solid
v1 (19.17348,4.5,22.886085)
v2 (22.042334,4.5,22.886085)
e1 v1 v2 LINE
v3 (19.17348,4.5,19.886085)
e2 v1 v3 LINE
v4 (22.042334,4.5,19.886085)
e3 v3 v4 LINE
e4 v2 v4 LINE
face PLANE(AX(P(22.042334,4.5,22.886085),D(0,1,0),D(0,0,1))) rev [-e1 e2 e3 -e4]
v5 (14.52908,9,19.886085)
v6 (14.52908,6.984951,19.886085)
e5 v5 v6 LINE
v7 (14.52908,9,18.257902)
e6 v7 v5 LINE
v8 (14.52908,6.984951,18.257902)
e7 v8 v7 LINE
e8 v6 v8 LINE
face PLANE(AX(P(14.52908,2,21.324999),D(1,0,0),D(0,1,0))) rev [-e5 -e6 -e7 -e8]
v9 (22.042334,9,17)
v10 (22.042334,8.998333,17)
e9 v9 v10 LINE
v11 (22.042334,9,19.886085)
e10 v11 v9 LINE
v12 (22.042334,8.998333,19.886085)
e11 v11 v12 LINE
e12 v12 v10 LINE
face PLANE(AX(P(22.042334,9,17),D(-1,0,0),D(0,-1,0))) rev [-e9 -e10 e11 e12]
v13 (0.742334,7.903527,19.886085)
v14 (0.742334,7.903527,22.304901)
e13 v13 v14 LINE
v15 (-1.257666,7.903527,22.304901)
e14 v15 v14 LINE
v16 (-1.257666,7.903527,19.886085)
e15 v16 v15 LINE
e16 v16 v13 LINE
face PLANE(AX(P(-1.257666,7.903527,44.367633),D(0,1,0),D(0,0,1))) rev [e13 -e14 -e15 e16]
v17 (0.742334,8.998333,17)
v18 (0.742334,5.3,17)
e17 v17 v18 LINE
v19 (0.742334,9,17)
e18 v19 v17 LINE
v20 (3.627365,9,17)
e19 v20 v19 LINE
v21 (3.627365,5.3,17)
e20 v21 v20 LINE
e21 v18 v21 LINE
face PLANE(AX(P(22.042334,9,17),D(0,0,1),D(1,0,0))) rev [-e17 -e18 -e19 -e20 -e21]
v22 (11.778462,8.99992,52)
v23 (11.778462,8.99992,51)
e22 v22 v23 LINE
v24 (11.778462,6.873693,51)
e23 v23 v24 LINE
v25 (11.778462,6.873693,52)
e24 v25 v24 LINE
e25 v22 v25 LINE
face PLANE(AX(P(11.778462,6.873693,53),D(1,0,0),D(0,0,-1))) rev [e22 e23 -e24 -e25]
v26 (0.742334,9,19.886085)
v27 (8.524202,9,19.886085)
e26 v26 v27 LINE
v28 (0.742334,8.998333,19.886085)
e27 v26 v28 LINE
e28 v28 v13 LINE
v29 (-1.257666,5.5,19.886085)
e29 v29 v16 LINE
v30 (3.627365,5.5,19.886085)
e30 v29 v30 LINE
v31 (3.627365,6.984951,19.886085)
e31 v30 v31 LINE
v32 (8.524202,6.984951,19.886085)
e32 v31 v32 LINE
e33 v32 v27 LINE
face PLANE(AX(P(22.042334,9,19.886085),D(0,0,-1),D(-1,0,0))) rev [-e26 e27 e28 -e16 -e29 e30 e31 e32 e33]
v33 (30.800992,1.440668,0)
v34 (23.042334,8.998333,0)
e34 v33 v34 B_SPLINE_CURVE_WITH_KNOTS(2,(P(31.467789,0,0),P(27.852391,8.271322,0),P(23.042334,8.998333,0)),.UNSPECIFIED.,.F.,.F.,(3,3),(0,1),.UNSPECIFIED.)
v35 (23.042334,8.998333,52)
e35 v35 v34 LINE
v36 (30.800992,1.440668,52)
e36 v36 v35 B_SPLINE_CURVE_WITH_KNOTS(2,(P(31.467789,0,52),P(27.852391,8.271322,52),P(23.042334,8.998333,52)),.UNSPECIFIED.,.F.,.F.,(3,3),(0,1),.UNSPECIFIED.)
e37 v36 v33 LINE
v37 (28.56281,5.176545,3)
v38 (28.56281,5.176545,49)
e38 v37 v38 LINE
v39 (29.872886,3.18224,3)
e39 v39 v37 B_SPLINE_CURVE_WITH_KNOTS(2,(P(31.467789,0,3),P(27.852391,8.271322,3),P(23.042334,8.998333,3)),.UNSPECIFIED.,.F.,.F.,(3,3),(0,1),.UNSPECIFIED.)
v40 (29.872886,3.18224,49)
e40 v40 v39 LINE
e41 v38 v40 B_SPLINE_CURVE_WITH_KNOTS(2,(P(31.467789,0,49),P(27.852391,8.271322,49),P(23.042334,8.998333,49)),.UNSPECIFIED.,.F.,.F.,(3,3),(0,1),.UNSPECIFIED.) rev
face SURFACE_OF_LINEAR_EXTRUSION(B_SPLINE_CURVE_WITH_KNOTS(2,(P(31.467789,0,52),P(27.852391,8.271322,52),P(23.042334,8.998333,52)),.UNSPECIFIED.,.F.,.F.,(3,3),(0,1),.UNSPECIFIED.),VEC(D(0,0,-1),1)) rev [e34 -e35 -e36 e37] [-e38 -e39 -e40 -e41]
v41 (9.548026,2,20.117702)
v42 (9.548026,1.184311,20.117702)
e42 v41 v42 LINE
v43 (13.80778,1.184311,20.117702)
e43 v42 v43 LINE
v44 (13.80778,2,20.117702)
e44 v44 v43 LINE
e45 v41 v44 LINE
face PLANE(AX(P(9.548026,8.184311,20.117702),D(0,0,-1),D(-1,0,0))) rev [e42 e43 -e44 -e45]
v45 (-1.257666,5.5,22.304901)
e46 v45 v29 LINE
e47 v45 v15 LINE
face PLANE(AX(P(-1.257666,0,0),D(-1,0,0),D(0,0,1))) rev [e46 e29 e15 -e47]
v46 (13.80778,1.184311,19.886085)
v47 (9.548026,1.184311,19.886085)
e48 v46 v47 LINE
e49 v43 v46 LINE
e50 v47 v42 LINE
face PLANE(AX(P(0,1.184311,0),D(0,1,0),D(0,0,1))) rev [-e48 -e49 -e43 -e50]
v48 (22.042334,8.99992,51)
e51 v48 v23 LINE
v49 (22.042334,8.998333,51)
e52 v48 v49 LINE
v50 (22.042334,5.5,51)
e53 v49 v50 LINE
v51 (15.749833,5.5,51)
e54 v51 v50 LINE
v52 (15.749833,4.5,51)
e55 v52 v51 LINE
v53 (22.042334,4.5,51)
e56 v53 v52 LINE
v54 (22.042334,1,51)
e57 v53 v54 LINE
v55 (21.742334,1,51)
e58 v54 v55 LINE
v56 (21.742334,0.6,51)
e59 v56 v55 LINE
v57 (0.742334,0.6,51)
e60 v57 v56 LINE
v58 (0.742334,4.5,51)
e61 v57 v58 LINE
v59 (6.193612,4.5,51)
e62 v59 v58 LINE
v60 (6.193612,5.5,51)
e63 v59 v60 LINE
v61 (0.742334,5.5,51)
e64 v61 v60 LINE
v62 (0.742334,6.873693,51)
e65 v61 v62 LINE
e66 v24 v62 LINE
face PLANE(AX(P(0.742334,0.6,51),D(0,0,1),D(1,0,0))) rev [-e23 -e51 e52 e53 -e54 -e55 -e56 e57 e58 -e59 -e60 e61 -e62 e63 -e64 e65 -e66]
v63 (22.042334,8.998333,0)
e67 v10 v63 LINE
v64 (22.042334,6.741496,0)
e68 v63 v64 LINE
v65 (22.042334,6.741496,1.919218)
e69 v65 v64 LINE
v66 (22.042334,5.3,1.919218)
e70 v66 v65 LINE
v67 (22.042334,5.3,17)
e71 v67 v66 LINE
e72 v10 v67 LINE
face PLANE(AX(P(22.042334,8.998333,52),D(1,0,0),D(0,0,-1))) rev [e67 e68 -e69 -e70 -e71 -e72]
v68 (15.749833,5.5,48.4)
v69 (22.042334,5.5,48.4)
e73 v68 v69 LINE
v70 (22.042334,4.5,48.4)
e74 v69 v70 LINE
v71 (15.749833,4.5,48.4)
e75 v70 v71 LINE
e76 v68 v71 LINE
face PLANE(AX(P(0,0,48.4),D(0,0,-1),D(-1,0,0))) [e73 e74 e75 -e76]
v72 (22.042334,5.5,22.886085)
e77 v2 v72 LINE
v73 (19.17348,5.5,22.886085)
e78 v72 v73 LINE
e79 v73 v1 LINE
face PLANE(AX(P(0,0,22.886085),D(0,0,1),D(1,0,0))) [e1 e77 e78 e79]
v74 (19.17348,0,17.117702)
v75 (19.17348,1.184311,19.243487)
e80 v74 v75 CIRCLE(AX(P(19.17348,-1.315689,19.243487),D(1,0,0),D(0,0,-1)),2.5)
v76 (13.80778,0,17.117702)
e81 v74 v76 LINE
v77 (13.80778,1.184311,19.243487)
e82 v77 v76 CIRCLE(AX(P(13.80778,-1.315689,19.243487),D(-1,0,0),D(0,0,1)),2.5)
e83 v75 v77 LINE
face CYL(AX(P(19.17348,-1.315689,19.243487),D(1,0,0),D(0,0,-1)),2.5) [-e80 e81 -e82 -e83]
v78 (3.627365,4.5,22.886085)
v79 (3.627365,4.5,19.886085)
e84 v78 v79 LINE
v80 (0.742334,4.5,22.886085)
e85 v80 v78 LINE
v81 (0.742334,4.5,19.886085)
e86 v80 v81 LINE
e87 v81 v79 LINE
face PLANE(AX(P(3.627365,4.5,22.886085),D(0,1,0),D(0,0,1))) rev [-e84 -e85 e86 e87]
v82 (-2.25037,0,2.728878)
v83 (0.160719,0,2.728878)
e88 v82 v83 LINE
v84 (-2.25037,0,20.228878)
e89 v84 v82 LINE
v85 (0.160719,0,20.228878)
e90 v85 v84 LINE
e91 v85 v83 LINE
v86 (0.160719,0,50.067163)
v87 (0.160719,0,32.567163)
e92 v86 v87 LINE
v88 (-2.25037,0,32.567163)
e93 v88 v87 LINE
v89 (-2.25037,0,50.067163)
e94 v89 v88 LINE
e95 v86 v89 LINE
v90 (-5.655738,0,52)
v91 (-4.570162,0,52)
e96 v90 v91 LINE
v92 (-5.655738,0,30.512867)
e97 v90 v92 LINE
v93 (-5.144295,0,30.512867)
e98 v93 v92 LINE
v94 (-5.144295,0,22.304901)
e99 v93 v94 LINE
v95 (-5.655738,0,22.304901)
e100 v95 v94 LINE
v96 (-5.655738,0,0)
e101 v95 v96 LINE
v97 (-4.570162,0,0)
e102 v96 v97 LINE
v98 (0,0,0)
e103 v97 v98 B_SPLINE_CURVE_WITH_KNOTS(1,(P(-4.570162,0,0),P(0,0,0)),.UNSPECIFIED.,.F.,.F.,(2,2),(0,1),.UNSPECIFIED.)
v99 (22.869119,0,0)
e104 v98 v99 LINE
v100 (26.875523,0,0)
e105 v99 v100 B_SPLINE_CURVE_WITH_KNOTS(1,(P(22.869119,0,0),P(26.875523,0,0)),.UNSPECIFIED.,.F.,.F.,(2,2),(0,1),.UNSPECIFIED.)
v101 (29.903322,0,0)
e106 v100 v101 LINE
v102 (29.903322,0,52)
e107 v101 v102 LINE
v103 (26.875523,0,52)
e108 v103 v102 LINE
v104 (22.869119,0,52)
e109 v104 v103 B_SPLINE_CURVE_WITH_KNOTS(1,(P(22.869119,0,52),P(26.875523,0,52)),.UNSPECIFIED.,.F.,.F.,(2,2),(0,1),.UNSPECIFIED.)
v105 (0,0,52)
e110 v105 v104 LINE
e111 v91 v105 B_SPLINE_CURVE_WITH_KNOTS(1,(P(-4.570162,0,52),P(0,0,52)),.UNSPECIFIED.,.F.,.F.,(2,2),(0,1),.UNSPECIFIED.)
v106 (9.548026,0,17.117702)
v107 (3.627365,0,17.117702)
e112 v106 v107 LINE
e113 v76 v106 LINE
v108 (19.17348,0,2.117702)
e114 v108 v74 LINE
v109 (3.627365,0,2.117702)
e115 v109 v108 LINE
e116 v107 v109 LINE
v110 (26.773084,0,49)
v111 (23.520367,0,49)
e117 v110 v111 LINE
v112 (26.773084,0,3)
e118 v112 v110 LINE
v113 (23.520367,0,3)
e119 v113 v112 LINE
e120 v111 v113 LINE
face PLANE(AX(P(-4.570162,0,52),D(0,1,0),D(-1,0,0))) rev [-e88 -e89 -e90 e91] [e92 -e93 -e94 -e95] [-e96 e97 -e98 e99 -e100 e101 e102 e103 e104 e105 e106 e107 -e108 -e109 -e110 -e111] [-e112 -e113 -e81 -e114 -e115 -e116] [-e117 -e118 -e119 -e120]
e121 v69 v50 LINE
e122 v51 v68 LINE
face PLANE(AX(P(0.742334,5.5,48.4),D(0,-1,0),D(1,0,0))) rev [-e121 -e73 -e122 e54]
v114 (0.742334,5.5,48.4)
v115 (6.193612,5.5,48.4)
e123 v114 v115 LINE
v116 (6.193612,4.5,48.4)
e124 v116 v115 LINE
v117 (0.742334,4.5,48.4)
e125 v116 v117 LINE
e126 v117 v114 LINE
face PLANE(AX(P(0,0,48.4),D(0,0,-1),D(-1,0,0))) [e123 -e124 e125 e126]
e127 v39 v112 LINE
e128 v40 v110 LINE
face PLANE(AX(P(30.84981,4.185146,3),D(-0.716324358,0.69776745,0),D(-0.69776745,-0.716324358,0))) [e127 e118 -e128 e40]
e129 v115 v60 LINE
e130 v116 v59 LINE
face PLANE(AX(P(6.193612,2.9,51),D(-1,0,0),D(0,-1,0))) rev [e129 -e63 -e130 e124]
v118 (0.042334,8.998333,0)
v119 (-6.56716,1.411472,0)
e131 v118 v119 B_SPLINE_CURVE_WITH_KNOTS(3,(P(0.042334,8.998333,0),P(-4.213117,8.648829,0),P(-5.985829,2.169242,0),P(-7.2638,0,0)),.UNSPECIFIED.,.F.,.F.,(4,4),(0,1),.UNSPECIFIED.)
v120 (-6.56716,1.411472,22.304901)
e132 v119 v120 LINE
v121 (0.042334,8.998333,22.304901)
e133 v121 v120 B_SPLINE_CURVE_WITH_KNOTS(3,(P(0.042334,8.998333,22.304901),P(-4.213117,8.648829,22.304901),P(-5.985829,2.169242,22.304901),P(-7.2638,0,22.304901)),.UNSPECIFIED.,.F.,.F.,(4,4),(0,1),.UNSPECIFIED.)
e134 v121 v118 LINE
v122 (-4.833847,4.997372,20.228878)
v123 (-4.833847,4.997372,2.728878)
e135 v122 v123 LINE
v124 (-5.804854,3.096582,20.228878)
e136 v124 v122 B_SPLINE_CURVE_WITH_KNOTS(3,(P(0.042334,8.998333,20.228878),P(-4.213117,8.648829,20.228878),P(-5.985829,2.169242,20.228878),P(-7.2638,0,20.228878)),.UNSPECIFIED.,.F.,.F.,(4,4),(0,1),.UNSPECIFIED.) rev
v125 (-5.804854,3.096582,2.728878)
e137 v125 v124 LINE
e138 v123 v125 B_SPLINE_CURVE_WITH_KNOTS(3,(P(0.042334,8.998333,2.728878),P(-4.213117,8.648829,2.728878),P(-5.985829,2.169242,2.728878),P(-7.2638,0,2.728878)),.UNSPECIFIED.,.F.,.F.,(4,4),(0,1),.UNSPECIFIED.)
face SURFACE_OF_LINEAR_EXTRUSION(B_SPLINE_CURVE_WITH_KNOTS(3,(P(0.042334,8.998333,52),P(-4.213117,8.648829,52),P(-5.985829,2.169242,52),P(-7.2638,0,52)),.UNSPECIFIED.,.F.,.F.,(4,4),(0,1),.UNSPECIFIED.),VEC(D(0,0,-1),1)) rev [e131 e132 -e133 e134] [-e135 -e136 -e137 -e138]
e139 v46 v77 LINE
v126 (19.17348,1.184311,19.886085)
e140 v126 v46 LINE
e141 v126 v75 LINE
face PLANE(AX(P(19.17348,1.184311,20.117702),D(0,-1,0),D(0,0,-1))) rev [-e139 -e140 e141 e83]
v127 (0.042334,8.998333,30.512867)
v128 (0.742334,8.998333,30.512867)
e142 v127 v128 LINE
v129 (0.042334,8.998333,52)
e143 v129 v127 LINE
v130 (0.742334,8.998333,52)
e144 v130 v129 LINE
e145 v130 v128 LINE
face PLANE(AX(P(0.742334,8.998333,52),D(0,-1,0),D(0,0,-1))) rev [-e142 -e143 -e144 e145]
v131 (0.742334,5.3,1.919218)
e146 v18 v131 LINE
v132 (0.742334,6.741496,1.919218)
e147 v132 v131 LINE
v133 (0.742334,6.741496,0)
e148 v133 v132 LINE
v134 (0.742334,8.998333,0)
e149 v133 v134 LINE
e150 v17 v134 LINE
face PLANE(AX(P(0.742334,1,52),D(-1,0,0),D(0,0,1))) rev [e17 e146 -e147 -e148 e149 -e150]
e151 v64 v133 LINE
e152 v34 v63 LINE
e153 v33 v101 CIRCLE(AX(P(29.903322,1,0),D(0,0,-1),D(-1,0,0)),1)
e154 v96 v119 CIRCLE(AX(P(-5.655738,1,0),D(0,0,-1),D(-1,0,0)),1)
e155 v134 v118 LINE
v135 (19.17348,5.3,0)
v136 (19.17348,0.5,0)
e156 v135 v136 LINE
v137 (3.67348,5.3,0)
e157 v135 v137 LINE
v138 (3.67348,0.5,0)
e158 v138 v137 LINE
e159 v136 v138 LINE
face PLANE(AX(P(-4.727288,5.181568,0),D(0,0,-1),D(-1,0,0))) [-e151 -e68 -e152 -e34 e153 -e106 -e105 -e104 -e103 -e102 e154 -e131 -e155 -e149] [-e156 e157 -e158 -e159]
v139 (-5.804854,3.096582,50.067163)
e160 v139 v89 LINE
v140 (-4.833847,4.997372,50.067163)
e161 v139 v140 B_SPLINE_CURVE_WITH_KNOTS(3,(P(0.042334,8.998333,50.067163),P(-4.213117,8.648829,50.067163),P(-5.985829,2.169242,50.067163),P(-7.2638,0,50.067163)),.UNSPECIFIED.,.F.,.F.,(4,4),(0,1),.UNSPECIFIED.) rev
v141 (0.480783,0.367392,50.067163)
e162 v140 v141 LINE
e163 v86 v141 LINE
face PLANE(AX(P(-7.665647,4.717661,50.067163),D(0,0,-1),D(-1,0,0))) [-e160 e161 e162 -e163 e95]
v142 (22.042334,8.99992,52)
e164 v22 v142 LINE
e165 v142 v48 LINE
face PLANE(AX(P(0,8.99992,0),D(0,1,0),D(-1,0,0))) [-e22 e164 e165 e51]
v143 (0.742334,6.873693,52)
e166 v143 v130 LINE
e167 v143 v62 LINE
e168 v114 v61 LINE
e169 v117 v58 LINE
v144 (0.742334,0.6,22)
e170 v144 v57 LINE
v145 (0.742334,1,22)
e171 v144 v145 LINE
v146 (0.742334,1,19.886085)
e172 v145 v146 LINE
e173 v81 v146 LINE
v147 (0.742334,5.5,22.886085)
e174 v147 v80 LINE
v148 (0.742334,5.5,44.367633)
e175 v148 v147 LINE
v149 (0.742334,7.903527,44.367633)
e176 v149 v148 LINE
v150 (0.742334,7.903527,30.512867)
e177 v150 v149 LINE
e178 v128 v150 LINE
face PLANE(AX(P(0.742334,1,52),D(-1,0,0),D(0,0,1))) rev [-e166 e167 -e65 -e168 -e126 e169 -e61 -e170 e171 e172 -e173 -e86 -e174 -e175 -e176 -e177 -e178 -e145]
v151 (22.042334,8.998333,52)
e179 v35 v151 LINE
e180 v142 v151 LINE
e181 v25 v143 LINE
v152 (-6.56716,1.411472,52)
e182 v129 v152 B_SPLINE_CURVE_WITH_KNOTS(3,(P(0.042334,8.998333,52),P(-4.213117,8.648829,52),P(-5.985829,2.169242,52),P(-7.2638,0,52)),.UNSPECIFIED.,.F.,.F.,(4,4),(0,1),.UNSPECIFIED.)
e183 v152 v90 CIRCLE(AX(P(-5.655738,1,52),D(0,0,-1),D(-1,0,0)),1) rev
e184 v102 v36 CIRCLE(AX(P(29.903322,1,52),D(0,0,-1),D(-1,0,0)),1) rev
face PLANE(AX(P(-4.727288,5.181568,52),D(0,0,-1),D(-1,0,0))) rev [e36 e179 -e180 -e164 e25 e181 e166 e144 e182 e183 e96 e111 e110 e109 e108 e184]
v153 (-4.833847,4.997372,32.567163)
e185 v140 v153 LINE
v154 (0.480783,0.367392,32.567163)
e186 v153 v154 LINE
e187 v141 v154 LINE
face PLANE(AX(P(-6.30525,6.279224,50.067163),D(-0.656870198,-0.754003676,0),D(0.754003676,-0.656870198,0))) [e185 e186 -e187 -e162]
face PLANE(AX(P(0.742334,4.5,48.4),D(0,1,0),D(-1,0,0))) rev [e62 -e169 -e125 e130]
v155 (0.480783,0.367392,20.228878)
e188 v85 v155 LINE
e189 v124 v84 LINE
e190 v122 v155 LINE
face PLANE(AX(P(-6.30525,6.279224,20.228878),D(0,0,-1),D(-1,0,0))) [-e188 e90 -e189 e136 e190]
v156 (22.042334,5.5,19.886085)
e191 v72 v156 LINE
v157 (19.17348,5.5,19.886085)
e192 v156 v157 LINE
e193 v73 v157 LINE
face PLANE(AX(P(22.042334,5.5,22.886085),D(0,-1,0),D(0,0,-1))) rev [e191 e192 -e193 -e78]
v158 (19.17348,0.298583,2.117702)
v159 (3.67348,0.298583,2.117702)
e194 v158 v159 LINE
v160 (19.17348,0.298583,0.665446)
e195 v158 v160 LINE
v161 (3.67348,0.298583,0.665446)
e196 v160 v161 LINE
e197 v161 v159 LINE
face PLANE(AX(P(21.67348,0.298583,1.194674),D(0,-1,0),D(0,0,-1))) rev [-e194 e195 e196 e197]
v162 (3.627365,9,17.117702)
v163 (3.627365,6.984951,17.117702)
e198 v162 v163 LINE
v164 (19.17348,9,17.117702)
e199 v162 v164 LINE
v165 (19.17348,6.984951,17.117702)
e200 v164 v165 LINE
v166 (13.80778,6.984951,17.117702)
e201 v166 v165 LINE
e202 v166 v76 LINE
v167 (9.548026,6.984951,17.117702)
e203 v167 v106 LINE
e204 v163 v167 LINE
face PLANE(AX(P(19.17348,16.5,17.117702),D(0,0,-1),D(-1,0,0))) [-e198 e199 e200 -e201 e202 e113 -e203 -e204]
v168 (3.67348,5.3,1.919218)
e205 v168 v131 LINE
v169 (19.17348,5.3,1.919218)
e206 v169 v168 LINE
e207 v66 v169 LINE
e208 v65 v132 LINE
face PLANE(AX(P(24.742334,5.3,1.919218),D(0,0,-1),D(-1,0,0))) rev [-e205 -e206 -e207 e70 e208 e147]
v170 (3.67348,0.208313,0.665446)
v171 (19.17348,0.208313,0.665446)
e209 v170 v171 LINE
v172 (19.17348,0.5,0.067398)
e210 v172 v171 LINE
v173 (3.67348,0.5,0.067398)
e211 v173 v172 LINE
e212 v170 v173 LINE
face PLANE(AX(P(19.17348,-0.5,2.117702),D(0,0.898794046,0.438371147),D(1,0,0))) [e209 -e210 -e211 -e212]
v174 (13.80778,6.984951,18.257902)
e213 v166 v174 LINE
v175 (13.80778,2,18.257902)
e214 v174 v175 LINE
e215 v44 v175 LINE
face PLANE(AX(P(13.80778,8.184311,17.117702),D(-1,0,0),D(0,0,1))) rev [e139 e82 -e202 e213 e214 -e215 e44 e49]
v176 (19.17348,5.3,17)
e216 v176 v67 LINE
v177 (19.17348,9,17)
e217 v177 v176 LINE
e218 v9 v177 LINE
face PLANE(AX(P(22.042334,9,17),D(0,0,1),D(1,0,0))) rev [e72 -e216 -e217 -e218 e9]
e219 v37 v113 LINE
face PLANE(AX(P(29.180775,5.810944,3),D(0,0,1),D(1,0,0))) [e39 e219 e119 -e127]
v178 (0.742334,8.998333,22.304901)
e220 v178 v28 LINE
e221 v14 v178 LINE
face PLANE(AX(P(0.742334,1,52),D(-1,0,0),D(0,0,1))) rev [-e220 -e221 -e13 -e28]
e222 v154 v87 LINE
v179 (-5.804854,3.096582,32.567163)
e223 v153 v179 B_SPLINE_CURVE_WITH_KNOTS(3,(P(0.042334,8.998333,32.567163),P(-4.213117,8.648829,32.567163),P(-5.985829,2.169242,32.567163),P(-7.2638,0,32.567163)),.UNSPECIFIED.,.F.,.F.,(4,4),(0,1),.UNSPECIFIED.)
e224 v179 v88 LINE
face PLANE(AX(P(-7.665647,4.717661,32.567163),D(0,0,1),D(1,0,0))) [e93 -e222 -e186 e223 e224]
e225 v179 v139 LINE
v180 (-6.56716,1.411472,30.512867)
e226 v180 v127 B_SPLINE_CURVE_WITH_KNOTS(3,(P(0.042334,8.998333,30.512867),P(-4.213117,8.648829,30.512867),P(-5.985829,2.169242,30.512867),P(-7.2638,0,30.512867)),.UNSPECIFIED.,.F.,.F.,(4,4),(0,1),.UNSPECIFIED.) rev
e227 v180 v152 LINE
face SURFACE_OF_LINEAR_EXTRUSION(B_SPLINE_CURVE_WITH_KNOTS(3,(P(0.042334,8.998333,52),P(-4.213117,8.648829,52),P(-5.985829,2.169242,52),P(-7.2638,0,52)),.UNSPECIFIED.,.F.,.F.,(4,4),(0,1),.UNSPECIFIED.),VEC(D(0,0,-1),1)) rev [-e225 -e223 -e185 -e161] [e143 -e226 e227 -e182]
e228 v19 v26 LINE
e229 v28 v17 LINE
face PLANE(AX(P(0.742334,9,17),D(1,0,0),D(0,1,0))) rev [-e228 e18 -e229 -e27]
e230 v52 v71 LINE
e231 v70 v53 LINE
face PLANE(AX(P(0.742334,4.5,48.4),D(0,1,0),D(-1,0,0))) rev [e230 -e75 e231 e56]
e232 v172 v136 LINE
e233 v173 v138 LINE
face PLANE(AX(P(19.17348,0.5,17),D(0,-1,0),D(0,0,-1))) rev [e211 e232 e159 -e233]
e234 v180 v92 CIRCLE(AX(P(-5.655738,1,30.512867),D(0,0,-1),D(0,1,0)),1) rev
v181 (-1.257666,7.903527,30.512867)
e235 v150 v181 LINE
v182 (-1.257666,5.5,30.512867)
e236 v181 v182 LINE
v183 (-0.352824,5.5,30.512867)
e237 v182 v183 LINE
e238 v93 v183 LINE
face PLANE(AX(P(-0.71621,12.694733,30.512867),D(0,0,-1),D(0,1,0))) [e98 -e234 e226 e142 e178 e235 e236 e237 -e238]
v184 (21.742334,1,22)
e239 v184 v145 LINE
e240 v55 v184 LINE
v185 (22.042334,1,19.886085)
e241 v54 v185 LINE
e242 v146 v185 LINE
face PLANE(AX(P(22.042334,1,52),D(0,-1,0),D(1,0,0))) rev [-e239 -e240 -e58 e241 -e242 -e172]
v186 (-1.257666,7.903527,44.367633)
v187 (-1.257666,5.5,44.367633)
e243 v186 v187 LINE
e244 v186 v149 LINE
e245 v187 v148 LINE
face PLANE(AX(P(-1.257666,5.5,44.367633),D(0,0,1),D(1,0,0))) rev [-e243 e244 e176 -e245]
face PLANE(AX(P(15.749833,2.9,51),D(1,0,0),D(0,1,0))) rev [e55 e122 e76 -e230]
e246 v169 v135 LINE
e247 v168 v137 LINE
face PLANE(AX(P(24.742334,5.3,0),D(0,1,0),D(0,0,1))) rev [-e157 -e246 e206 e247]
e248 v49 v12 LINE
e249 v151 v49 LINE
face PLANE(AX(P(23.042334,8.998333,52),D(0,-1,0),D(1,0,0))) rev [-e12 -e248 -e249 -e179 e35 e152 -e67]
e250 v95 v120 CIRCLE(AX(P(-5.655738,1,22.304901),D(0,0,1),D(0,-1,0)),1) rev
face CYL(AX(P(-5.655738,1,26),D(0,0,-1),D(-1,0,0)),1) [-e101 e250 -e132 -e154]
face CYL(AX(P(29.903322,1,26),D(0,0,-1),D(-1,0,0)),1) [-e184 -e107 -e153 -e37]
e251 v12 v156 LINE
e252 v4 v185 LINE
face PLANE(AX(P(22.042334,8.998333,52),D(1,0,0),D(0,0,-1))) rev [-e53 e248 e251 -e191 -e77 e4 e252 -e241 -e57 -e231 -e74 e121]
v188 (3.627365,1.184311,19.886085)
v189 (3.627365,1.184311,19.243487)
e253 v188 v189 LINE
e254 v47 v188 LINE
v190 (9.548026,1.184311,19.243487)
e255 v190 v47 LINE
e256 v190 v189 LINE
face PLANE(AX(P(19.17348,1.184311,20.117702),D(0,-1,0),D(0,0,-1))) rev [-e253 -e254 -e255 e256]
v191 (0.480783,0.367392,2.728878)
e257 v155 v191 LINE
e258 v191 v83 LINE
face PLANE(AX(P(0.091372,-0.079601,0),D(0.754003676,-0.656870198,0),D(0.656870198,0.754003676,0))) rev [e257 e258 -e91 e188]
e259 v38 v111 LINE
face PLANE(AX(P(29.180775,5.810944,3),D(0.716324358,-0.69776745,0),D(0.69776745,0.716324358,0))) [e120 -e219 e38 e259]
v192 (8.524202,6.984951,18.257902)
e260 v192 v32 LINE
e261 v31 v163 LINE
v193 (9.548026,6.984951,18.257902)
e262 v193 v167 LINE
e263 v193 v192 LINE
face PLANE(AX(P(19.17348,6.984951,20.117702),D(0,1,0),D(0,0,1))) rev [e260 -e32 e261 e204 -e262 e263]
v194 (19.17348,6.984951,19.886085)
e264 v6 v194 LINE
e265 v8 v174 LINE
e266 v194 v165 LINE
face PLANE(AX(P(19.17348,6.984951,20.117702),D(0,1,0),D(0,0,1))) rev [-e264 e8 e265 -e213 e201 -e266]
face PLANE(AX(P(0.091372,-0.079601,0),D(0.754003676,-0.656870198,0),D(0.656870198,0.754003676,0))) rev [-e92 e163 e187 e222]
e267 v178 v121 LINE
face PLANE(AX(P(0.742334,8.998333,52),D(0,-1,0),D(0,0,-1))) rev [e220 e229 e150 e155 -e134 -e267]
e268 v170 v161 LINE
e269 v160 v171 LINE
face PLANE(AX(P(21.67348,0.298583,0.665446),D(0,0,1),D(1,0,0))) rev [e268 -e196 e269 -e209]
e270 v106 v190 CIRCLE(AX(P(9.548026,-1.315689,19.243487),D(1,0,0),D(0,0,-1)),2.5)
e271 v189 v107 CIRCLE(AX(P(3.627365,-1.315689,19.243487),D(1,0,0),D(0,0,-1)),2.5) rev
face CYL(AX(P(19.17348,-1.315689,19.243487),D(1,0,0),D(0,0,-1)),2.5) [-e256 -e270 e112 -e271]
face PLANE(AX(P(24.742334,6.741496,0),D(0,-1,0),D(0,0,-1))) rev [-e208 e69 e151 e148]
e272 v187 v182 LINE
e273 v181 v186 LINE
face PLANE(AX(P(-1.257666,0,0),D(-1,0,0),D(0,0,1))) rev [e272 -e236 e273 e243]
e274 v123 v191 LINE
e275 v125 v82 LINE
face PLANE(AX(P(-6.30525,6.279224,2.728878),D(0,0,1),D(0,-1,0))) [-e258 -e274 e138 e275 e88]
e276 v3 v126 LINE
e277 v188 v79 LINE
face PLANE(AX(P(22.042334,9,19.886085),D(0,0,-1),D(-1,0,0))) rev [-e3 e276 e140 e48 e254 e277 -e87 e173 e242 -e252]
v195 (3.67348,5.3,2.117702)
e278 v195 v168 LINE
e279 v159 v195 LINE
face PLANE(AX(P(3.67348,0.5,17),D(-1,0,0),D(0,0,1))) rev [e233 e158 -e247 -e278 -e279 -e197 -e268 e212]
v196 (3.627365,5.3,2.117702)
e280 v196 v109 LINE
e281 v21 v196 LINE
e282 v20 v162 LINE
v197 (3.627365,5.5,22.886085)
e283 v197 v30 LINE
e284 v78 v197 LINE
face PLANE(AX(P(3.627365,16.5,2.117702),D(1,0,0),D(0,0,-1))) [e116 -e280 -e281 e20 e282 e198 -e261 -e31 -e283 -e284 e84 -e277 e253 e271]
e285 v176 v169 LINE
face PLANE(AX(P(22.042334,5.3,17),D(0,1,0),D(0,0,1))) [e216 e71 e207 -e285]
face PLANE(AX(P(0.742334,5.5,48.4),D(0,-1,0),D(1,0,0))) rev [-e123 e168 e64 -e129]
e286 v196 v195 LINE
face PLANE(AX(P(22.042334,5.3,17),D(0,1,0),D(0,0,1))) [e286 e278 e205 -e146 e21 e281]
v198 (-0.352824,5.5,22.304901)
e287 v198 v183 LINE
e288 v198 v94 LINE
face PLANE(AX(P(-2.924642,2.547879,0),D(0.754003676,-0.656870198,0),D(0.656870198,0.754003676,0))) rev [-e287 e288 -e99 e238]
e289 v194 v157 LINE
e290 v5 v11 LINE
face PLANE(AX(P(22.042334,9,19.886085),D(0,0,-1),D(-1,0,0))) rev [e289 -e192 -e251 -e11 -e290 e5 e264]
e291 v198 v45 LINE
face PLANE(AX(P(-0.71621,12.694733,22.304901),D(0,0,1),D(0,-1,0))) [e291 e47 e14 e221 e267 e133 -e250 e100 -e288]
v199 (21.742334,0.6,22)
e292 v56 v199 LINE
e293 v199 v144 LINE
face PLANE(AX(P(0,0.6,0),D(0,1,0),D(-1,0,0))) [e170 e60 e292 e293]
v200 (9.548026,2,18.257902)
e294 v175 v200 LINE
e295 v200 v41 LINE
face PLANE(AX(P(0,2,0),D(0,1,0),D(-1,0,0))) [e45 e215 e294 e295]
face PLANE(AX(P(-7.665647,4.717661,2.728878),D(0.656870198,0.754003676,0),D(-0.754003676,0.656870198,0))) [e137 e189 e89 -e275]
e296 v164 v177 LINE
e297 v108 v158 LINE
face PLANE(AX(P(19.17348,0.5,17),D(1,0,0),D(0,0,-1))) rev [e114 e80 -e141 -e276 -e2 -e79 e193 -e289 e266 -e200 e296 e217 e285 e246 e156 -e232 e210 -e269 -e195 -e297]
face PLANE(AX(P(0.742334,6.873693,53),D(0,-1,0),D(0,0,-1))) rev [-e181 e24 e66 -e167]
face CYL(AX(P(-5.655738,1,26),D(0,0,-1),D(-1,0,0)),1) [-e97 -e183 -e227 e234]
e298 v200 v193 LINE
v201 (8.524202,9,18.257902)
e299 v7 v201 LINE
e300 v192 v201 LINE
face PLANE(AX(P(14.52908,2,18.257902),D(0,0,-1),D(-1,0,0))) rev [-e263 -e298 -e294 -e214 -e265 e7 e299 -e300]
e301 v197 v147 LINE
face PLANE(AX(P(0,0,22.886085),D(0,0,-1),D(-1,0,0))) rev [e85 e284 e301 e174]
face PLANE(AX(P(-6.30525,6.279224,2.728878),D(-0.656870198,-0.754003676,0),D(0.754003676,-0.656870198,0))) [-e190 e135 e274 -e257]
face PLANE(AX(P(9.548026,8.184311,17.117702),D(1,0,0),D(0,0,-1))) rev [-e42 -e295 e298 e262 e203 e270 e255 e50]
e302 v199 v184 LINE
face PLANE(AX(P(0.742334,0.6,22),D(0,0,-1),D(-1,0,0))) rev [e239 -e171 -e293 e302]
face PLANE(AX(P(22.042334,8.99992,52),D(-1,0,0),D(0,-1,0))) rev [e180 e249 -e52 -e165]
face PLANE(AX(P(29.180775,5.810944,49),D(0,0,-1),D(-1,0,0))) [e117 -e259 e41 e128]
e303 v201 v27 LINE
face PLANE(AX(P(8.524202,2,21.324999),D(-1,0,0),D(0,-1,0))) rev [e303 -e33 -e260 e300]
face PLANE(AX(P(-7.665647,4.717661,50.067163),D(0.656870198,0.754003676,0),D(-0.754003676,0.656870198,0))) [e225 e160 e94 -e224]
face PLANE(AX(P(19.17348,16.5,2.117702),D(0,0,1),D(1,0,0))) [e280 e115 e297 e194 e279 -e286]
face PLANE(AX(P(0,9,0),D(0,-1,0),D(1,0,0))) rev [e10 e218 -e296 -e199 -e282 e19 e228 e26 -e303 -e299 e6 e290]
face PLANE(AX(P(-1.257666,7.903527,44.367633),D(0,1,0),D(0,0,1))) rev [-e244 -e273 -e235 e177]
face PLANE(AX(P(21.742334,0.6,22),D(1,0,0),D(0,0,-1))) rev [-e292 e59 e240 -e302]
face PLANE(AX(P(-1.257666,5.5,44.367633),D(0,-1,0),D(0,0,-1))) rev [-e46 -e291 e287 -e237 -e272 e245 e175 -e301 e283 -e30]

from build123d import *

# Parameters (mm, degrees)
BOSS_EXTRUDE2_DEPTH      = 52
FILLET2_R                = 1
CUT_EXTRUDE2_DEPTH       = 3
CUT_EXTRUDE2_DEPTH_BACK  = 6
SKETCH10_W               = 2.071027546
SKETCH10_H               = 17.5
SKETCH12_W               = 21
SKETCH12_H               = 29
BATTERY_DEPTH            = 0.4
SKETCH14_W               = 21.3
SKETCH14_H               = 1
BOSS_EXTRUDE4_DEPTH      = 7.999920354
FILLET5_R                = 1
SKETCH19_W               = 21.3
SKETCH19_H               = 1
BOSS_EXTRUDE5_DEPTH      = 2.6
SKETCH20_W               = 9.556221564
SKETCH20_H               = 2.6
CUT_EXTRUDE9_DEPTH       = 2.6
SKETCH21_W               = 21.3
SKETCH21_H               = 2.886084762
BOSS_EXTRUDE6_DEPTH      = 8
SKETCH23_W               = 24.481547991
SKETCH23_H               = 2.403526745
CUT_EXTRUDE10_DEPTH      = 2
SKETCH26_W               = 11.036128308
SKETCH26_H               = 2.126226966
CUT_EXTRUDE11_DEPTH      = 2
CUT_EXTRUDE12_DEPTH      = 2
CUT_EXTRUDE12_DEPTH_BACK = 11
SKETCH27_W               = 46
SKETCH27_H               = 2.33
CUT_EXTRUDE15_DEPTH      = 3
CUT_EXTRUDE15_DEPTH_BACK = 2
SKETCH30_W               = 16.027497941
SKETCH30_H               = 8.207966742
SKETCH32_W               = 21.3
SKETCH32_H               = 4.3
BOSS_EXTRUDE7_DEPTH      = 17
SKETCH33_W               = 15.5
SKETCH33_H               = 4.8
CUT_EXTRUDE16_DEPTH      = 17
CUT_EXTRUDE17_DEPTH      = 16
CUT_EXTRUDE17_DEPTH_BACK = 16
SKETCH34_W               = 15.546115034
SKETCH34_H               = 15
CHAMFER1_SIZE            = 2.050303842
CHAMFER1_SIZE_2          = 1
SKETCH36_W               = 1.919218309
SKETCH36_H               = 1.441495618
BOSS_EXTRUDE8_DEPTH      = 24
SKETCH37_W               = 15.546115034
SKETCH37_H               = 5.800639797
CUT_EXTRUDE18_DEPTH      = 3
SKETCH38_W               = 4.259754253
SKETCH38_H               = 3
BOSS_EXTRUDE9_DEPTH      = 7
FILLET6_R                = 2.5
BOSS_EXTRUDE10_DEPTH     = 18
SKETCH41_W               = 2.868853839
SKETCH41_H               = 1
SKETCH41_W_2             = 2.885031127
BOSS_EXTRUDE11_DEPTH     = 3
SKETCH42_W               = 6.004877842
SKETCH42_H               = 3.067097043
CUT_EXTRUDE19_DEPTH      = 7


with BuildPart() as part:
    # Sketch1 → Boss-Extrude2 (new body)
    with BuildSketch(Plane.XY):
        with BuildLine():
            Line((-4.570161627, 0), (-7.263800128, 0))
            add(Edge.make_bspline(
                [(0.042333709, 8.998333002), (-4.213116867, 8.648828695), (-5.985828681, 2.169241543), (-7.263800128, 0)],
                knots=[0, 0, 0, 0, 1, 1, 1, 1], degree=3))
            Line((0.042333709, 8.998333002), (0.742333709, 8.998333002))
            Line((0.742333709, 8.998333002), (0.742333709, 1))
            Line((0.742333709, 1), (22.042333709, 1))
            Line((22.042333709, 1), (22.042333709, 8.998333002))
            Line((22.042333709, 8.998333002), (23.042333709, 8.998333002))
            add(Edge.make_bspline(
                [(23.042333709, 8.998333002), (27.852391375, 8.27132168), (31.467788923, 0)],
                knots=[0, 0, 0, 1, 1, 1], degree=2))
            Line((31.467788923, 0), (26.875523276, 0))
            Line((26.875523276, 0), (22.86911945, 0))
            Line((22.86911945, 0), (0, 0))
            Line((0, 0), (-4.570161627, 0))
        make_face()
    extrude(amount=BOSS_EXTRUDE2_DEPTH)

    # Fillet2
    fillet2_edges = [part.edges().sort_by_distance(p)[0] for p in [
        (-7.263800128, 0, 26),
    ]]
    fillet(fillet2_edges, radius=FILLET2_R)

    # Sketch10 → Cut-Extrude2 (cut, two sides: drawn at the far end of the back side and taken through both)
    with BuildSketch(Plane(origin=(-4.432649633, 3.861619691, 0), x_dir=(0.6568701979277837, 0.7540036757697632, 0), z_dir=(-0.7540036757697632, 0.6568701979277837, 0)).offset(-CUT_EXTRUDE2_DEPTH_BACK)):
        with Locations((-0.442686988, -41.317163409)):
            Rectangle(SKETCH10_W, SKETCH10_H)
        with Locations((-0.442686988, -11.478878468)):
            Rectangle(SKETCH10_W, SKETCH10_H)
    extrude(amount=CUT_EXTRUDE2_DEPTH + CUT_EXTRUDE2_DEPTH_BACK, mode=Mode.SUBTRACT)

    # Sketch12 → Battery (cut)
    with BuildSketch(Plane(origin=(0, 1, 0), x_dir=(1, 0, 0), z_dir=(0, 1, 0))):
        with Locations((11.242333709, -36.5)):
            Rectangle(SKETCH12_W, SKETCH12_H)
    extrude(amount=-BATTERY_DEPTH, mode=Mode.SUBTRACT)

    # Sketch14 → Boss-Extrude4 (add)
    with BuildSketch(Plane(origin=(0, 1, 0), x_dir=(1, 0, 0), z_dir=(0, 1, 0))):
        with Locations((11.392333709, -51.5)):
            Rectangle(SKETCH14_W, SKETCH14_H)
    extrude(amount=BOSS_EXTRUDE4_DEPTH)

    # Fillet5
    fillet5_edges = [part.edges().sort_by_distance(p)[0] for p in [
        (31.467788923, 0, 26),
    ]]
    fillet(fillet5_edges, radius=FILLET5_R)

    # Sketch19 → Boss-Extrude5 (add)
    with BuildSketch(Plane(origin=(0, 0, 51), x_dir=(-1, 0, 0), z_dir=(0, 0, -1))):
        with Locations((-11.392333709, 5)):
            Rectangle(SKETCH19_W, SKETCH19_H)
    extrude(amount=BOSS_EXTRUDE5_DEPTH)

    # Sketch20 → Cut-Extrude9 (cut)
    with BuildSketch(Plane(origin=(0, 5.5, 0), x_dir=(1, 0, 0), z_dir=(0, 1, 0))):
        with Locations((10.971722634, -49.7)):
            Rectangle(SKETCH20_W, SKETCH20_H)
    extrude(amount=-CUT_EXTRUDE9_DEPTH, mode=Mode.SUBTRACT)

    # Sketch21 → Boss-Extrude6 (add)
    with BuildSketch(Plane(origin=(0, 1, 0), x_dir=(1, 0, 0), z_dir=(0, 1, 0))):
        with Locations((11.392333709, -18.443042381)):
            Rectangle(SKETCH21_W, SKETCH21_H)
    extrude(amount=BOSS_EXTRUDE6_DEPTH)

    # Sketch23 → Cut-Extrude10 (cut)
    with BuildSketch(Plane(origin=(0.742333709, 0, 0), x_dir=(0, 0, -1), z_dir=(1, 0, 0))):
        with Locations((-32.126858758, 6.701763373)):
            Rectangle(SKETCH23_W, SKETCH23_H)
    extrude(amount=-CUT_EXTRUDE10_DEPTH, mode=Mode.SUBTRACT)

    # Sketch26 → Cut-Extrude11 (cut)
    with BuildSketch(Plane(origin=(0, 0, 51), x_dir=(-1, 0, 0), z_dir=(0, 0, -1))):
        with Locations((-6.260397863, 7.936806871)):
            Rectangle(SKETCH26_W, SKETCH26_H)
    extrude(amount=-CUT_EXTRUDE11_DEPTH, mode=Mode.SUBTRACT)

    # Sketch27 → Cut-Extrude12 (cut, two sides: drawn at the far end of the back side and taken through both)
    with BuildSketch(Plane(origin=(15.71645511, 16.134429341, 0), x_dir=(0, 0, -1), z_dir=(0.6977674498915984, 0.7163243580053493, 0)).offset(-CUT_EXTRUDE12_DEPTH_BACK)):
        with Locations((-26, -18.013212029)):
            Rectangle(SKETCH27_W, SKETCH27_H)
    extrude(amount=CUT_EXTRUDE12_DEPTH + CUT_EXTRUDE12_DEPTH_BACK, mode=Mode.SUBTRACT)

    # Sketch30 → Cut-Extrude15 (cut, two sides: drawn at the far end of the back side and taken through both)
    with BuildSketch(Plane(origin=(-4.432649633, 3.861619691, 0), x_dir=(0.6568701979277837, 0.7540036757697632, 0), z_dir=(-0.7540036757697632, 0.6568701979277837, 0)).offset(-CUT_EXTRUDE15_DEPTH_BACK)):
        with Locations((1.087669114, -26.408883952)):
            Rectangle(SKETCH30_W, SKETCH30_H)
    extrude(amount=CUT_EXTRUDE15_DEPTH + CUT_EXTRUDE15_DEPTH_BACK, mode=Mode.SUBTRACT)

    # Sketch32 → Boss-Extrude7 (add)
    with BuildSketch(Plane(origin=(0, 0, 0), x_dir=(-1, 0, 0), z_dir=(0, 0, -1))):
        with Locations((-11.392333709, 3.15)):
            Rectangle(SKETCH32_W, SKETCH32_H)
    extrude(amount=-BOSS_EXTRUDE7_DEPTH)

    # Sketch33 → Cut-Extrude16 (cut)
    with BuildSketch(Plane(origin=(0, 0, 0), x_dir=(-1, 0, 0), z_dir=(0, 0, -1))):
        with Locations((-11.42347987, 2.9)):
            Rectangle(SKETCH33_W, SKETCH33_H)
    extrude(amount=-CUT_EXTRUDE16_DEPTH, mode=Mode.SUBTRACT)

    # Sketch34 → Cut-Extrude17 (cut, two sides: drawn at the far end of the back side and taken through both)
    with BuildSketch(Plane(origin=(0, 0.5, 0), x_dir=(1, 0, 0), z_dir=(0, 1, 0)).offset(-CUT_EXTRUDE17_DEPTH_BACK)):
        with Locations((11.400422353, -9.617701537)):
            Rectangle(SKETCH34_W, SKETCH34_H)
    extrude(amount=CUT_EXTRUDE17_DEPTH + CUT_EXTRUDE17_DEPTH_BACK, mode=Mode.SUBTRACT)

    # Chamfer1
    # the kernel refuses this chamfer: 2.050303842, 1 mm, written as the material it takes off along each edge
    with BuildSketch(Plane(origin=(19.17347987, 0.5, 2.117701537), x_dir=(0, 0.016923890849829, -0.9998567807033681), z_dir=(-1, 0, 0))) as chamfer1_piece_1:
        Polygon((CHAMFER1_SIZE * 0.999856780498, CHAMFER1_SIZE * 0.0169238908464), (-CHAMFER1_SIZE_2 * 0.0169238908498, CHAMFER1_SIZE_2 * 0.999856780703), (0, 0), align=None)
    extrude(amount=15.5, mode=Mode.SUBTRACT)

    # Sketch36 → Boss-Extrude8 (add)
    with BuildSketch(Plane(origin=(0.742333709, 0, 0), x_dir=(0, 0, -1), z_dir=(1, 0, 0))):
        with Locations((-0.959609155, 6.020747809)):
            Rectangle(SKETCH36_W, SKETCH36_H)
    extrude(amount=BOSS_EXTRUDE8_DEPTH)

    # Sketch37 → Cut-Extrude18 (cut)
    with BuildSketch(Plane(origin=(0, 0, 17.117701537), x_dir=(-1, 0, 0), z_dir=(0, 0, -1))):
        with Locations((-11.400422353, 4.08463089)):
            Rectangle(SKETCH37_W, SKETCH37_H)
    extrude(amount=-CUT_EXTRUDE18_DEPTH, mode=Mode.SUBTRACT)

    # Sketch38 → Boss-Extrude9 (add)
    with BuildSketch(Plane(origin=(0, 1.184310992, 0), x_dir=(1, 0, 0), z_dir=(0, 1, 0))):
        with Locations((11.677903031, -18.617701537)):
            Rectangle(SKETCH38_W, SKETCH38_H)
    extrude(amount=BOSS_EXTRUDE9_DEPTH)

    # Fillet6
    # the kernel refuses this fillet: 2.5 mm, written as the material it takes off along each edge
    with BuildSketch(Plane(origin=(14.862488739, 1.184310992, 17.117701537), x_dir=(0, -1, 0), z_dir=(-1, 0, 0))) as fillet6_piece_1_section:
        with BuildLine():
            CenterArc((2.5, 2.125785134), FILLET6_R, 180, 58.245844015)
            Line((0, 2.125785134), (-0.05, 2.125785134))
            Line((-0.05, 2.125785134), (-0.05, 0))
            Line((-0.05, 0), (0, -0.05))
            ThreePointArc((0, -0.05), (0.592155496, -0.05), (1.157997212, -0.042515703))
            Line((1.157997212, -0.042515703), (1.184310992, 0))
        make_face()
    fillet6_piece_1 = extrude(amount=11.235123902, mode=Mode.PRIVATE)
    fillet6_piece_1 = split(fillet6_piece_1, bisect_by=Plane(origin=(13.807780157, 0.878026012, 17.652561739), z_dir=(1, 0, 0)), keep=Keep.TOP, mode=Mode.PRIVATE)
    add(fillet6_piece_1, mode=Mode.SUBTRACT)
    with BuildSketch(Plane(origin=(9.548025904, 1.184310992, 17.117701537), x_dir=(0, -1, 0), z_dir=(-1, 0, 0))) as fillet6_piece_2:
        with BuildLine():
            CenterArc((2.5, 2.125785134), FILLET6_R, 180, 58.245844015)
            Line((0, 2.125785134), (-0.05, 2.125785134))
            Line((-0.05, 2.125785134), (-0.05, 0))
            Line((-0.05, 0), (0, -0.05))
            ThreePointArc((0, -0.05), (0.592155496, -0.05), (1.157997212, -0.042515703))
            Line((1.157997212, -0.042515703), (1.184310992, 0))
        make_face()
    extrude(amount=5.920661068, mode=Mode.SUBTRACT)
    with BuildSketch(Plane(origin=(19.17347987, 1.184310992, 17.117701537), x_dir=(0, -1, 0), z_dir=(-1, 0, 0))) as fillet6_piece_3:
        with BuildLine():
            CenterArc((2.5, 2.125785134), FILLET6_R, 180, 58.245844015)
            Line((0, 2.125785134), (-0.05, 2.125785134))
            Line((-0.05, 2.125785134), (-0.05, 0))
            Line((-0.05, 0), (0, -0.05))
            ThreePointArc((0, -0.05), (0.592155496, -0.05), (1.157997212, -0.042515703))
            Line((1.157997212, -0.042515703), (1.184310992, 0))
        make_face()
    extrude(amount=5.365699713, mode=Mode.SUBTRACT)
    with BuildSketch(Plane(origin=(19.17347987, 1.184310992, 17.117701537), x_dir=(0, -1, 0), z_dir=(-1, 0, 0))) as fillet6_piece_4_section:
        with BuildLine():
            CenterArc((2.5, 2.125785134), FILLET6_R, 180, 58.245844015)
            Line((0, 2.125785134), (-0.05, 2.125785134))
            Line((-0.05, 2.125785134), (-0.05, 0))
            Line((-0.05, 0), (0, -0.05))
            ThreePointArc((0, -0.05), (0.592155496, -0.05), (1.157997212, -0.042515703))
            Line((1.157997212, -0.042515703), (1.184310992, 0))
        make_face()
    fillet6_piece_4 = extrude(amount=10.680162547, mode=Mode.PRIVATE)
    fillet6_piece_4 = split(fillet6_piece_4, bisect_by=Plane(origin=(9.548025904, 0.878026012, 17.652561739), z_dir=(-1, 0, 0)), keep=Keep.TOP, mode=Mode.PRIVATE)
    add(fillet6_piece_4, mode=Mode.SUBTRACT)

    # Sketch40 → Boss-Extrude10 (add)
    with BuildSketch(Plane(origin=(3.67347987, 0, 0), x_dir=(0, 0, -1), z_dir=(1, 0, 0))):
        Polygon((-1.194674299, 0), (-2.117701537, 0), (-2.117701537, 0.29858263), (-1.194674299, 0.29858263), (-0.66544558, 0.29858263), (-0.66544558, 0), align=None)
    extrude(amount=BOSS_EXTRUDE10_DEPTH)

    # Sketch41 → Boss-Extrude11 (add)
    with BuildSketch(Plane.XY.offset(19.886084762)):
        with Locations((20.607906789, 5)):
            Rectangle(SKETCH41_W, SKETCH41_H)
        with Locations((2.184849273, 5)):
            Rectangle(SKETCH41_W_2, SKETCH41_H)
    extrude(amount=BOSS_EXTRUDE11_DEPTH)

    # Sketch42 → Cut-Extrude19 (cut)
    with BuildSketch(Plane(origin=(0, 9, 0), x_dir=(1, 0, 0), z_dir=(0, 1, 0))):
        with Locations((11.52664117, -19.791450538)):
            Rectangle(SKETCH42_W, SKETCH42_H)
    extrude(amount=-CUT_EXTRUDE19_DEPTH, mode=Mode.SUBTRACT)


solid = part.part
